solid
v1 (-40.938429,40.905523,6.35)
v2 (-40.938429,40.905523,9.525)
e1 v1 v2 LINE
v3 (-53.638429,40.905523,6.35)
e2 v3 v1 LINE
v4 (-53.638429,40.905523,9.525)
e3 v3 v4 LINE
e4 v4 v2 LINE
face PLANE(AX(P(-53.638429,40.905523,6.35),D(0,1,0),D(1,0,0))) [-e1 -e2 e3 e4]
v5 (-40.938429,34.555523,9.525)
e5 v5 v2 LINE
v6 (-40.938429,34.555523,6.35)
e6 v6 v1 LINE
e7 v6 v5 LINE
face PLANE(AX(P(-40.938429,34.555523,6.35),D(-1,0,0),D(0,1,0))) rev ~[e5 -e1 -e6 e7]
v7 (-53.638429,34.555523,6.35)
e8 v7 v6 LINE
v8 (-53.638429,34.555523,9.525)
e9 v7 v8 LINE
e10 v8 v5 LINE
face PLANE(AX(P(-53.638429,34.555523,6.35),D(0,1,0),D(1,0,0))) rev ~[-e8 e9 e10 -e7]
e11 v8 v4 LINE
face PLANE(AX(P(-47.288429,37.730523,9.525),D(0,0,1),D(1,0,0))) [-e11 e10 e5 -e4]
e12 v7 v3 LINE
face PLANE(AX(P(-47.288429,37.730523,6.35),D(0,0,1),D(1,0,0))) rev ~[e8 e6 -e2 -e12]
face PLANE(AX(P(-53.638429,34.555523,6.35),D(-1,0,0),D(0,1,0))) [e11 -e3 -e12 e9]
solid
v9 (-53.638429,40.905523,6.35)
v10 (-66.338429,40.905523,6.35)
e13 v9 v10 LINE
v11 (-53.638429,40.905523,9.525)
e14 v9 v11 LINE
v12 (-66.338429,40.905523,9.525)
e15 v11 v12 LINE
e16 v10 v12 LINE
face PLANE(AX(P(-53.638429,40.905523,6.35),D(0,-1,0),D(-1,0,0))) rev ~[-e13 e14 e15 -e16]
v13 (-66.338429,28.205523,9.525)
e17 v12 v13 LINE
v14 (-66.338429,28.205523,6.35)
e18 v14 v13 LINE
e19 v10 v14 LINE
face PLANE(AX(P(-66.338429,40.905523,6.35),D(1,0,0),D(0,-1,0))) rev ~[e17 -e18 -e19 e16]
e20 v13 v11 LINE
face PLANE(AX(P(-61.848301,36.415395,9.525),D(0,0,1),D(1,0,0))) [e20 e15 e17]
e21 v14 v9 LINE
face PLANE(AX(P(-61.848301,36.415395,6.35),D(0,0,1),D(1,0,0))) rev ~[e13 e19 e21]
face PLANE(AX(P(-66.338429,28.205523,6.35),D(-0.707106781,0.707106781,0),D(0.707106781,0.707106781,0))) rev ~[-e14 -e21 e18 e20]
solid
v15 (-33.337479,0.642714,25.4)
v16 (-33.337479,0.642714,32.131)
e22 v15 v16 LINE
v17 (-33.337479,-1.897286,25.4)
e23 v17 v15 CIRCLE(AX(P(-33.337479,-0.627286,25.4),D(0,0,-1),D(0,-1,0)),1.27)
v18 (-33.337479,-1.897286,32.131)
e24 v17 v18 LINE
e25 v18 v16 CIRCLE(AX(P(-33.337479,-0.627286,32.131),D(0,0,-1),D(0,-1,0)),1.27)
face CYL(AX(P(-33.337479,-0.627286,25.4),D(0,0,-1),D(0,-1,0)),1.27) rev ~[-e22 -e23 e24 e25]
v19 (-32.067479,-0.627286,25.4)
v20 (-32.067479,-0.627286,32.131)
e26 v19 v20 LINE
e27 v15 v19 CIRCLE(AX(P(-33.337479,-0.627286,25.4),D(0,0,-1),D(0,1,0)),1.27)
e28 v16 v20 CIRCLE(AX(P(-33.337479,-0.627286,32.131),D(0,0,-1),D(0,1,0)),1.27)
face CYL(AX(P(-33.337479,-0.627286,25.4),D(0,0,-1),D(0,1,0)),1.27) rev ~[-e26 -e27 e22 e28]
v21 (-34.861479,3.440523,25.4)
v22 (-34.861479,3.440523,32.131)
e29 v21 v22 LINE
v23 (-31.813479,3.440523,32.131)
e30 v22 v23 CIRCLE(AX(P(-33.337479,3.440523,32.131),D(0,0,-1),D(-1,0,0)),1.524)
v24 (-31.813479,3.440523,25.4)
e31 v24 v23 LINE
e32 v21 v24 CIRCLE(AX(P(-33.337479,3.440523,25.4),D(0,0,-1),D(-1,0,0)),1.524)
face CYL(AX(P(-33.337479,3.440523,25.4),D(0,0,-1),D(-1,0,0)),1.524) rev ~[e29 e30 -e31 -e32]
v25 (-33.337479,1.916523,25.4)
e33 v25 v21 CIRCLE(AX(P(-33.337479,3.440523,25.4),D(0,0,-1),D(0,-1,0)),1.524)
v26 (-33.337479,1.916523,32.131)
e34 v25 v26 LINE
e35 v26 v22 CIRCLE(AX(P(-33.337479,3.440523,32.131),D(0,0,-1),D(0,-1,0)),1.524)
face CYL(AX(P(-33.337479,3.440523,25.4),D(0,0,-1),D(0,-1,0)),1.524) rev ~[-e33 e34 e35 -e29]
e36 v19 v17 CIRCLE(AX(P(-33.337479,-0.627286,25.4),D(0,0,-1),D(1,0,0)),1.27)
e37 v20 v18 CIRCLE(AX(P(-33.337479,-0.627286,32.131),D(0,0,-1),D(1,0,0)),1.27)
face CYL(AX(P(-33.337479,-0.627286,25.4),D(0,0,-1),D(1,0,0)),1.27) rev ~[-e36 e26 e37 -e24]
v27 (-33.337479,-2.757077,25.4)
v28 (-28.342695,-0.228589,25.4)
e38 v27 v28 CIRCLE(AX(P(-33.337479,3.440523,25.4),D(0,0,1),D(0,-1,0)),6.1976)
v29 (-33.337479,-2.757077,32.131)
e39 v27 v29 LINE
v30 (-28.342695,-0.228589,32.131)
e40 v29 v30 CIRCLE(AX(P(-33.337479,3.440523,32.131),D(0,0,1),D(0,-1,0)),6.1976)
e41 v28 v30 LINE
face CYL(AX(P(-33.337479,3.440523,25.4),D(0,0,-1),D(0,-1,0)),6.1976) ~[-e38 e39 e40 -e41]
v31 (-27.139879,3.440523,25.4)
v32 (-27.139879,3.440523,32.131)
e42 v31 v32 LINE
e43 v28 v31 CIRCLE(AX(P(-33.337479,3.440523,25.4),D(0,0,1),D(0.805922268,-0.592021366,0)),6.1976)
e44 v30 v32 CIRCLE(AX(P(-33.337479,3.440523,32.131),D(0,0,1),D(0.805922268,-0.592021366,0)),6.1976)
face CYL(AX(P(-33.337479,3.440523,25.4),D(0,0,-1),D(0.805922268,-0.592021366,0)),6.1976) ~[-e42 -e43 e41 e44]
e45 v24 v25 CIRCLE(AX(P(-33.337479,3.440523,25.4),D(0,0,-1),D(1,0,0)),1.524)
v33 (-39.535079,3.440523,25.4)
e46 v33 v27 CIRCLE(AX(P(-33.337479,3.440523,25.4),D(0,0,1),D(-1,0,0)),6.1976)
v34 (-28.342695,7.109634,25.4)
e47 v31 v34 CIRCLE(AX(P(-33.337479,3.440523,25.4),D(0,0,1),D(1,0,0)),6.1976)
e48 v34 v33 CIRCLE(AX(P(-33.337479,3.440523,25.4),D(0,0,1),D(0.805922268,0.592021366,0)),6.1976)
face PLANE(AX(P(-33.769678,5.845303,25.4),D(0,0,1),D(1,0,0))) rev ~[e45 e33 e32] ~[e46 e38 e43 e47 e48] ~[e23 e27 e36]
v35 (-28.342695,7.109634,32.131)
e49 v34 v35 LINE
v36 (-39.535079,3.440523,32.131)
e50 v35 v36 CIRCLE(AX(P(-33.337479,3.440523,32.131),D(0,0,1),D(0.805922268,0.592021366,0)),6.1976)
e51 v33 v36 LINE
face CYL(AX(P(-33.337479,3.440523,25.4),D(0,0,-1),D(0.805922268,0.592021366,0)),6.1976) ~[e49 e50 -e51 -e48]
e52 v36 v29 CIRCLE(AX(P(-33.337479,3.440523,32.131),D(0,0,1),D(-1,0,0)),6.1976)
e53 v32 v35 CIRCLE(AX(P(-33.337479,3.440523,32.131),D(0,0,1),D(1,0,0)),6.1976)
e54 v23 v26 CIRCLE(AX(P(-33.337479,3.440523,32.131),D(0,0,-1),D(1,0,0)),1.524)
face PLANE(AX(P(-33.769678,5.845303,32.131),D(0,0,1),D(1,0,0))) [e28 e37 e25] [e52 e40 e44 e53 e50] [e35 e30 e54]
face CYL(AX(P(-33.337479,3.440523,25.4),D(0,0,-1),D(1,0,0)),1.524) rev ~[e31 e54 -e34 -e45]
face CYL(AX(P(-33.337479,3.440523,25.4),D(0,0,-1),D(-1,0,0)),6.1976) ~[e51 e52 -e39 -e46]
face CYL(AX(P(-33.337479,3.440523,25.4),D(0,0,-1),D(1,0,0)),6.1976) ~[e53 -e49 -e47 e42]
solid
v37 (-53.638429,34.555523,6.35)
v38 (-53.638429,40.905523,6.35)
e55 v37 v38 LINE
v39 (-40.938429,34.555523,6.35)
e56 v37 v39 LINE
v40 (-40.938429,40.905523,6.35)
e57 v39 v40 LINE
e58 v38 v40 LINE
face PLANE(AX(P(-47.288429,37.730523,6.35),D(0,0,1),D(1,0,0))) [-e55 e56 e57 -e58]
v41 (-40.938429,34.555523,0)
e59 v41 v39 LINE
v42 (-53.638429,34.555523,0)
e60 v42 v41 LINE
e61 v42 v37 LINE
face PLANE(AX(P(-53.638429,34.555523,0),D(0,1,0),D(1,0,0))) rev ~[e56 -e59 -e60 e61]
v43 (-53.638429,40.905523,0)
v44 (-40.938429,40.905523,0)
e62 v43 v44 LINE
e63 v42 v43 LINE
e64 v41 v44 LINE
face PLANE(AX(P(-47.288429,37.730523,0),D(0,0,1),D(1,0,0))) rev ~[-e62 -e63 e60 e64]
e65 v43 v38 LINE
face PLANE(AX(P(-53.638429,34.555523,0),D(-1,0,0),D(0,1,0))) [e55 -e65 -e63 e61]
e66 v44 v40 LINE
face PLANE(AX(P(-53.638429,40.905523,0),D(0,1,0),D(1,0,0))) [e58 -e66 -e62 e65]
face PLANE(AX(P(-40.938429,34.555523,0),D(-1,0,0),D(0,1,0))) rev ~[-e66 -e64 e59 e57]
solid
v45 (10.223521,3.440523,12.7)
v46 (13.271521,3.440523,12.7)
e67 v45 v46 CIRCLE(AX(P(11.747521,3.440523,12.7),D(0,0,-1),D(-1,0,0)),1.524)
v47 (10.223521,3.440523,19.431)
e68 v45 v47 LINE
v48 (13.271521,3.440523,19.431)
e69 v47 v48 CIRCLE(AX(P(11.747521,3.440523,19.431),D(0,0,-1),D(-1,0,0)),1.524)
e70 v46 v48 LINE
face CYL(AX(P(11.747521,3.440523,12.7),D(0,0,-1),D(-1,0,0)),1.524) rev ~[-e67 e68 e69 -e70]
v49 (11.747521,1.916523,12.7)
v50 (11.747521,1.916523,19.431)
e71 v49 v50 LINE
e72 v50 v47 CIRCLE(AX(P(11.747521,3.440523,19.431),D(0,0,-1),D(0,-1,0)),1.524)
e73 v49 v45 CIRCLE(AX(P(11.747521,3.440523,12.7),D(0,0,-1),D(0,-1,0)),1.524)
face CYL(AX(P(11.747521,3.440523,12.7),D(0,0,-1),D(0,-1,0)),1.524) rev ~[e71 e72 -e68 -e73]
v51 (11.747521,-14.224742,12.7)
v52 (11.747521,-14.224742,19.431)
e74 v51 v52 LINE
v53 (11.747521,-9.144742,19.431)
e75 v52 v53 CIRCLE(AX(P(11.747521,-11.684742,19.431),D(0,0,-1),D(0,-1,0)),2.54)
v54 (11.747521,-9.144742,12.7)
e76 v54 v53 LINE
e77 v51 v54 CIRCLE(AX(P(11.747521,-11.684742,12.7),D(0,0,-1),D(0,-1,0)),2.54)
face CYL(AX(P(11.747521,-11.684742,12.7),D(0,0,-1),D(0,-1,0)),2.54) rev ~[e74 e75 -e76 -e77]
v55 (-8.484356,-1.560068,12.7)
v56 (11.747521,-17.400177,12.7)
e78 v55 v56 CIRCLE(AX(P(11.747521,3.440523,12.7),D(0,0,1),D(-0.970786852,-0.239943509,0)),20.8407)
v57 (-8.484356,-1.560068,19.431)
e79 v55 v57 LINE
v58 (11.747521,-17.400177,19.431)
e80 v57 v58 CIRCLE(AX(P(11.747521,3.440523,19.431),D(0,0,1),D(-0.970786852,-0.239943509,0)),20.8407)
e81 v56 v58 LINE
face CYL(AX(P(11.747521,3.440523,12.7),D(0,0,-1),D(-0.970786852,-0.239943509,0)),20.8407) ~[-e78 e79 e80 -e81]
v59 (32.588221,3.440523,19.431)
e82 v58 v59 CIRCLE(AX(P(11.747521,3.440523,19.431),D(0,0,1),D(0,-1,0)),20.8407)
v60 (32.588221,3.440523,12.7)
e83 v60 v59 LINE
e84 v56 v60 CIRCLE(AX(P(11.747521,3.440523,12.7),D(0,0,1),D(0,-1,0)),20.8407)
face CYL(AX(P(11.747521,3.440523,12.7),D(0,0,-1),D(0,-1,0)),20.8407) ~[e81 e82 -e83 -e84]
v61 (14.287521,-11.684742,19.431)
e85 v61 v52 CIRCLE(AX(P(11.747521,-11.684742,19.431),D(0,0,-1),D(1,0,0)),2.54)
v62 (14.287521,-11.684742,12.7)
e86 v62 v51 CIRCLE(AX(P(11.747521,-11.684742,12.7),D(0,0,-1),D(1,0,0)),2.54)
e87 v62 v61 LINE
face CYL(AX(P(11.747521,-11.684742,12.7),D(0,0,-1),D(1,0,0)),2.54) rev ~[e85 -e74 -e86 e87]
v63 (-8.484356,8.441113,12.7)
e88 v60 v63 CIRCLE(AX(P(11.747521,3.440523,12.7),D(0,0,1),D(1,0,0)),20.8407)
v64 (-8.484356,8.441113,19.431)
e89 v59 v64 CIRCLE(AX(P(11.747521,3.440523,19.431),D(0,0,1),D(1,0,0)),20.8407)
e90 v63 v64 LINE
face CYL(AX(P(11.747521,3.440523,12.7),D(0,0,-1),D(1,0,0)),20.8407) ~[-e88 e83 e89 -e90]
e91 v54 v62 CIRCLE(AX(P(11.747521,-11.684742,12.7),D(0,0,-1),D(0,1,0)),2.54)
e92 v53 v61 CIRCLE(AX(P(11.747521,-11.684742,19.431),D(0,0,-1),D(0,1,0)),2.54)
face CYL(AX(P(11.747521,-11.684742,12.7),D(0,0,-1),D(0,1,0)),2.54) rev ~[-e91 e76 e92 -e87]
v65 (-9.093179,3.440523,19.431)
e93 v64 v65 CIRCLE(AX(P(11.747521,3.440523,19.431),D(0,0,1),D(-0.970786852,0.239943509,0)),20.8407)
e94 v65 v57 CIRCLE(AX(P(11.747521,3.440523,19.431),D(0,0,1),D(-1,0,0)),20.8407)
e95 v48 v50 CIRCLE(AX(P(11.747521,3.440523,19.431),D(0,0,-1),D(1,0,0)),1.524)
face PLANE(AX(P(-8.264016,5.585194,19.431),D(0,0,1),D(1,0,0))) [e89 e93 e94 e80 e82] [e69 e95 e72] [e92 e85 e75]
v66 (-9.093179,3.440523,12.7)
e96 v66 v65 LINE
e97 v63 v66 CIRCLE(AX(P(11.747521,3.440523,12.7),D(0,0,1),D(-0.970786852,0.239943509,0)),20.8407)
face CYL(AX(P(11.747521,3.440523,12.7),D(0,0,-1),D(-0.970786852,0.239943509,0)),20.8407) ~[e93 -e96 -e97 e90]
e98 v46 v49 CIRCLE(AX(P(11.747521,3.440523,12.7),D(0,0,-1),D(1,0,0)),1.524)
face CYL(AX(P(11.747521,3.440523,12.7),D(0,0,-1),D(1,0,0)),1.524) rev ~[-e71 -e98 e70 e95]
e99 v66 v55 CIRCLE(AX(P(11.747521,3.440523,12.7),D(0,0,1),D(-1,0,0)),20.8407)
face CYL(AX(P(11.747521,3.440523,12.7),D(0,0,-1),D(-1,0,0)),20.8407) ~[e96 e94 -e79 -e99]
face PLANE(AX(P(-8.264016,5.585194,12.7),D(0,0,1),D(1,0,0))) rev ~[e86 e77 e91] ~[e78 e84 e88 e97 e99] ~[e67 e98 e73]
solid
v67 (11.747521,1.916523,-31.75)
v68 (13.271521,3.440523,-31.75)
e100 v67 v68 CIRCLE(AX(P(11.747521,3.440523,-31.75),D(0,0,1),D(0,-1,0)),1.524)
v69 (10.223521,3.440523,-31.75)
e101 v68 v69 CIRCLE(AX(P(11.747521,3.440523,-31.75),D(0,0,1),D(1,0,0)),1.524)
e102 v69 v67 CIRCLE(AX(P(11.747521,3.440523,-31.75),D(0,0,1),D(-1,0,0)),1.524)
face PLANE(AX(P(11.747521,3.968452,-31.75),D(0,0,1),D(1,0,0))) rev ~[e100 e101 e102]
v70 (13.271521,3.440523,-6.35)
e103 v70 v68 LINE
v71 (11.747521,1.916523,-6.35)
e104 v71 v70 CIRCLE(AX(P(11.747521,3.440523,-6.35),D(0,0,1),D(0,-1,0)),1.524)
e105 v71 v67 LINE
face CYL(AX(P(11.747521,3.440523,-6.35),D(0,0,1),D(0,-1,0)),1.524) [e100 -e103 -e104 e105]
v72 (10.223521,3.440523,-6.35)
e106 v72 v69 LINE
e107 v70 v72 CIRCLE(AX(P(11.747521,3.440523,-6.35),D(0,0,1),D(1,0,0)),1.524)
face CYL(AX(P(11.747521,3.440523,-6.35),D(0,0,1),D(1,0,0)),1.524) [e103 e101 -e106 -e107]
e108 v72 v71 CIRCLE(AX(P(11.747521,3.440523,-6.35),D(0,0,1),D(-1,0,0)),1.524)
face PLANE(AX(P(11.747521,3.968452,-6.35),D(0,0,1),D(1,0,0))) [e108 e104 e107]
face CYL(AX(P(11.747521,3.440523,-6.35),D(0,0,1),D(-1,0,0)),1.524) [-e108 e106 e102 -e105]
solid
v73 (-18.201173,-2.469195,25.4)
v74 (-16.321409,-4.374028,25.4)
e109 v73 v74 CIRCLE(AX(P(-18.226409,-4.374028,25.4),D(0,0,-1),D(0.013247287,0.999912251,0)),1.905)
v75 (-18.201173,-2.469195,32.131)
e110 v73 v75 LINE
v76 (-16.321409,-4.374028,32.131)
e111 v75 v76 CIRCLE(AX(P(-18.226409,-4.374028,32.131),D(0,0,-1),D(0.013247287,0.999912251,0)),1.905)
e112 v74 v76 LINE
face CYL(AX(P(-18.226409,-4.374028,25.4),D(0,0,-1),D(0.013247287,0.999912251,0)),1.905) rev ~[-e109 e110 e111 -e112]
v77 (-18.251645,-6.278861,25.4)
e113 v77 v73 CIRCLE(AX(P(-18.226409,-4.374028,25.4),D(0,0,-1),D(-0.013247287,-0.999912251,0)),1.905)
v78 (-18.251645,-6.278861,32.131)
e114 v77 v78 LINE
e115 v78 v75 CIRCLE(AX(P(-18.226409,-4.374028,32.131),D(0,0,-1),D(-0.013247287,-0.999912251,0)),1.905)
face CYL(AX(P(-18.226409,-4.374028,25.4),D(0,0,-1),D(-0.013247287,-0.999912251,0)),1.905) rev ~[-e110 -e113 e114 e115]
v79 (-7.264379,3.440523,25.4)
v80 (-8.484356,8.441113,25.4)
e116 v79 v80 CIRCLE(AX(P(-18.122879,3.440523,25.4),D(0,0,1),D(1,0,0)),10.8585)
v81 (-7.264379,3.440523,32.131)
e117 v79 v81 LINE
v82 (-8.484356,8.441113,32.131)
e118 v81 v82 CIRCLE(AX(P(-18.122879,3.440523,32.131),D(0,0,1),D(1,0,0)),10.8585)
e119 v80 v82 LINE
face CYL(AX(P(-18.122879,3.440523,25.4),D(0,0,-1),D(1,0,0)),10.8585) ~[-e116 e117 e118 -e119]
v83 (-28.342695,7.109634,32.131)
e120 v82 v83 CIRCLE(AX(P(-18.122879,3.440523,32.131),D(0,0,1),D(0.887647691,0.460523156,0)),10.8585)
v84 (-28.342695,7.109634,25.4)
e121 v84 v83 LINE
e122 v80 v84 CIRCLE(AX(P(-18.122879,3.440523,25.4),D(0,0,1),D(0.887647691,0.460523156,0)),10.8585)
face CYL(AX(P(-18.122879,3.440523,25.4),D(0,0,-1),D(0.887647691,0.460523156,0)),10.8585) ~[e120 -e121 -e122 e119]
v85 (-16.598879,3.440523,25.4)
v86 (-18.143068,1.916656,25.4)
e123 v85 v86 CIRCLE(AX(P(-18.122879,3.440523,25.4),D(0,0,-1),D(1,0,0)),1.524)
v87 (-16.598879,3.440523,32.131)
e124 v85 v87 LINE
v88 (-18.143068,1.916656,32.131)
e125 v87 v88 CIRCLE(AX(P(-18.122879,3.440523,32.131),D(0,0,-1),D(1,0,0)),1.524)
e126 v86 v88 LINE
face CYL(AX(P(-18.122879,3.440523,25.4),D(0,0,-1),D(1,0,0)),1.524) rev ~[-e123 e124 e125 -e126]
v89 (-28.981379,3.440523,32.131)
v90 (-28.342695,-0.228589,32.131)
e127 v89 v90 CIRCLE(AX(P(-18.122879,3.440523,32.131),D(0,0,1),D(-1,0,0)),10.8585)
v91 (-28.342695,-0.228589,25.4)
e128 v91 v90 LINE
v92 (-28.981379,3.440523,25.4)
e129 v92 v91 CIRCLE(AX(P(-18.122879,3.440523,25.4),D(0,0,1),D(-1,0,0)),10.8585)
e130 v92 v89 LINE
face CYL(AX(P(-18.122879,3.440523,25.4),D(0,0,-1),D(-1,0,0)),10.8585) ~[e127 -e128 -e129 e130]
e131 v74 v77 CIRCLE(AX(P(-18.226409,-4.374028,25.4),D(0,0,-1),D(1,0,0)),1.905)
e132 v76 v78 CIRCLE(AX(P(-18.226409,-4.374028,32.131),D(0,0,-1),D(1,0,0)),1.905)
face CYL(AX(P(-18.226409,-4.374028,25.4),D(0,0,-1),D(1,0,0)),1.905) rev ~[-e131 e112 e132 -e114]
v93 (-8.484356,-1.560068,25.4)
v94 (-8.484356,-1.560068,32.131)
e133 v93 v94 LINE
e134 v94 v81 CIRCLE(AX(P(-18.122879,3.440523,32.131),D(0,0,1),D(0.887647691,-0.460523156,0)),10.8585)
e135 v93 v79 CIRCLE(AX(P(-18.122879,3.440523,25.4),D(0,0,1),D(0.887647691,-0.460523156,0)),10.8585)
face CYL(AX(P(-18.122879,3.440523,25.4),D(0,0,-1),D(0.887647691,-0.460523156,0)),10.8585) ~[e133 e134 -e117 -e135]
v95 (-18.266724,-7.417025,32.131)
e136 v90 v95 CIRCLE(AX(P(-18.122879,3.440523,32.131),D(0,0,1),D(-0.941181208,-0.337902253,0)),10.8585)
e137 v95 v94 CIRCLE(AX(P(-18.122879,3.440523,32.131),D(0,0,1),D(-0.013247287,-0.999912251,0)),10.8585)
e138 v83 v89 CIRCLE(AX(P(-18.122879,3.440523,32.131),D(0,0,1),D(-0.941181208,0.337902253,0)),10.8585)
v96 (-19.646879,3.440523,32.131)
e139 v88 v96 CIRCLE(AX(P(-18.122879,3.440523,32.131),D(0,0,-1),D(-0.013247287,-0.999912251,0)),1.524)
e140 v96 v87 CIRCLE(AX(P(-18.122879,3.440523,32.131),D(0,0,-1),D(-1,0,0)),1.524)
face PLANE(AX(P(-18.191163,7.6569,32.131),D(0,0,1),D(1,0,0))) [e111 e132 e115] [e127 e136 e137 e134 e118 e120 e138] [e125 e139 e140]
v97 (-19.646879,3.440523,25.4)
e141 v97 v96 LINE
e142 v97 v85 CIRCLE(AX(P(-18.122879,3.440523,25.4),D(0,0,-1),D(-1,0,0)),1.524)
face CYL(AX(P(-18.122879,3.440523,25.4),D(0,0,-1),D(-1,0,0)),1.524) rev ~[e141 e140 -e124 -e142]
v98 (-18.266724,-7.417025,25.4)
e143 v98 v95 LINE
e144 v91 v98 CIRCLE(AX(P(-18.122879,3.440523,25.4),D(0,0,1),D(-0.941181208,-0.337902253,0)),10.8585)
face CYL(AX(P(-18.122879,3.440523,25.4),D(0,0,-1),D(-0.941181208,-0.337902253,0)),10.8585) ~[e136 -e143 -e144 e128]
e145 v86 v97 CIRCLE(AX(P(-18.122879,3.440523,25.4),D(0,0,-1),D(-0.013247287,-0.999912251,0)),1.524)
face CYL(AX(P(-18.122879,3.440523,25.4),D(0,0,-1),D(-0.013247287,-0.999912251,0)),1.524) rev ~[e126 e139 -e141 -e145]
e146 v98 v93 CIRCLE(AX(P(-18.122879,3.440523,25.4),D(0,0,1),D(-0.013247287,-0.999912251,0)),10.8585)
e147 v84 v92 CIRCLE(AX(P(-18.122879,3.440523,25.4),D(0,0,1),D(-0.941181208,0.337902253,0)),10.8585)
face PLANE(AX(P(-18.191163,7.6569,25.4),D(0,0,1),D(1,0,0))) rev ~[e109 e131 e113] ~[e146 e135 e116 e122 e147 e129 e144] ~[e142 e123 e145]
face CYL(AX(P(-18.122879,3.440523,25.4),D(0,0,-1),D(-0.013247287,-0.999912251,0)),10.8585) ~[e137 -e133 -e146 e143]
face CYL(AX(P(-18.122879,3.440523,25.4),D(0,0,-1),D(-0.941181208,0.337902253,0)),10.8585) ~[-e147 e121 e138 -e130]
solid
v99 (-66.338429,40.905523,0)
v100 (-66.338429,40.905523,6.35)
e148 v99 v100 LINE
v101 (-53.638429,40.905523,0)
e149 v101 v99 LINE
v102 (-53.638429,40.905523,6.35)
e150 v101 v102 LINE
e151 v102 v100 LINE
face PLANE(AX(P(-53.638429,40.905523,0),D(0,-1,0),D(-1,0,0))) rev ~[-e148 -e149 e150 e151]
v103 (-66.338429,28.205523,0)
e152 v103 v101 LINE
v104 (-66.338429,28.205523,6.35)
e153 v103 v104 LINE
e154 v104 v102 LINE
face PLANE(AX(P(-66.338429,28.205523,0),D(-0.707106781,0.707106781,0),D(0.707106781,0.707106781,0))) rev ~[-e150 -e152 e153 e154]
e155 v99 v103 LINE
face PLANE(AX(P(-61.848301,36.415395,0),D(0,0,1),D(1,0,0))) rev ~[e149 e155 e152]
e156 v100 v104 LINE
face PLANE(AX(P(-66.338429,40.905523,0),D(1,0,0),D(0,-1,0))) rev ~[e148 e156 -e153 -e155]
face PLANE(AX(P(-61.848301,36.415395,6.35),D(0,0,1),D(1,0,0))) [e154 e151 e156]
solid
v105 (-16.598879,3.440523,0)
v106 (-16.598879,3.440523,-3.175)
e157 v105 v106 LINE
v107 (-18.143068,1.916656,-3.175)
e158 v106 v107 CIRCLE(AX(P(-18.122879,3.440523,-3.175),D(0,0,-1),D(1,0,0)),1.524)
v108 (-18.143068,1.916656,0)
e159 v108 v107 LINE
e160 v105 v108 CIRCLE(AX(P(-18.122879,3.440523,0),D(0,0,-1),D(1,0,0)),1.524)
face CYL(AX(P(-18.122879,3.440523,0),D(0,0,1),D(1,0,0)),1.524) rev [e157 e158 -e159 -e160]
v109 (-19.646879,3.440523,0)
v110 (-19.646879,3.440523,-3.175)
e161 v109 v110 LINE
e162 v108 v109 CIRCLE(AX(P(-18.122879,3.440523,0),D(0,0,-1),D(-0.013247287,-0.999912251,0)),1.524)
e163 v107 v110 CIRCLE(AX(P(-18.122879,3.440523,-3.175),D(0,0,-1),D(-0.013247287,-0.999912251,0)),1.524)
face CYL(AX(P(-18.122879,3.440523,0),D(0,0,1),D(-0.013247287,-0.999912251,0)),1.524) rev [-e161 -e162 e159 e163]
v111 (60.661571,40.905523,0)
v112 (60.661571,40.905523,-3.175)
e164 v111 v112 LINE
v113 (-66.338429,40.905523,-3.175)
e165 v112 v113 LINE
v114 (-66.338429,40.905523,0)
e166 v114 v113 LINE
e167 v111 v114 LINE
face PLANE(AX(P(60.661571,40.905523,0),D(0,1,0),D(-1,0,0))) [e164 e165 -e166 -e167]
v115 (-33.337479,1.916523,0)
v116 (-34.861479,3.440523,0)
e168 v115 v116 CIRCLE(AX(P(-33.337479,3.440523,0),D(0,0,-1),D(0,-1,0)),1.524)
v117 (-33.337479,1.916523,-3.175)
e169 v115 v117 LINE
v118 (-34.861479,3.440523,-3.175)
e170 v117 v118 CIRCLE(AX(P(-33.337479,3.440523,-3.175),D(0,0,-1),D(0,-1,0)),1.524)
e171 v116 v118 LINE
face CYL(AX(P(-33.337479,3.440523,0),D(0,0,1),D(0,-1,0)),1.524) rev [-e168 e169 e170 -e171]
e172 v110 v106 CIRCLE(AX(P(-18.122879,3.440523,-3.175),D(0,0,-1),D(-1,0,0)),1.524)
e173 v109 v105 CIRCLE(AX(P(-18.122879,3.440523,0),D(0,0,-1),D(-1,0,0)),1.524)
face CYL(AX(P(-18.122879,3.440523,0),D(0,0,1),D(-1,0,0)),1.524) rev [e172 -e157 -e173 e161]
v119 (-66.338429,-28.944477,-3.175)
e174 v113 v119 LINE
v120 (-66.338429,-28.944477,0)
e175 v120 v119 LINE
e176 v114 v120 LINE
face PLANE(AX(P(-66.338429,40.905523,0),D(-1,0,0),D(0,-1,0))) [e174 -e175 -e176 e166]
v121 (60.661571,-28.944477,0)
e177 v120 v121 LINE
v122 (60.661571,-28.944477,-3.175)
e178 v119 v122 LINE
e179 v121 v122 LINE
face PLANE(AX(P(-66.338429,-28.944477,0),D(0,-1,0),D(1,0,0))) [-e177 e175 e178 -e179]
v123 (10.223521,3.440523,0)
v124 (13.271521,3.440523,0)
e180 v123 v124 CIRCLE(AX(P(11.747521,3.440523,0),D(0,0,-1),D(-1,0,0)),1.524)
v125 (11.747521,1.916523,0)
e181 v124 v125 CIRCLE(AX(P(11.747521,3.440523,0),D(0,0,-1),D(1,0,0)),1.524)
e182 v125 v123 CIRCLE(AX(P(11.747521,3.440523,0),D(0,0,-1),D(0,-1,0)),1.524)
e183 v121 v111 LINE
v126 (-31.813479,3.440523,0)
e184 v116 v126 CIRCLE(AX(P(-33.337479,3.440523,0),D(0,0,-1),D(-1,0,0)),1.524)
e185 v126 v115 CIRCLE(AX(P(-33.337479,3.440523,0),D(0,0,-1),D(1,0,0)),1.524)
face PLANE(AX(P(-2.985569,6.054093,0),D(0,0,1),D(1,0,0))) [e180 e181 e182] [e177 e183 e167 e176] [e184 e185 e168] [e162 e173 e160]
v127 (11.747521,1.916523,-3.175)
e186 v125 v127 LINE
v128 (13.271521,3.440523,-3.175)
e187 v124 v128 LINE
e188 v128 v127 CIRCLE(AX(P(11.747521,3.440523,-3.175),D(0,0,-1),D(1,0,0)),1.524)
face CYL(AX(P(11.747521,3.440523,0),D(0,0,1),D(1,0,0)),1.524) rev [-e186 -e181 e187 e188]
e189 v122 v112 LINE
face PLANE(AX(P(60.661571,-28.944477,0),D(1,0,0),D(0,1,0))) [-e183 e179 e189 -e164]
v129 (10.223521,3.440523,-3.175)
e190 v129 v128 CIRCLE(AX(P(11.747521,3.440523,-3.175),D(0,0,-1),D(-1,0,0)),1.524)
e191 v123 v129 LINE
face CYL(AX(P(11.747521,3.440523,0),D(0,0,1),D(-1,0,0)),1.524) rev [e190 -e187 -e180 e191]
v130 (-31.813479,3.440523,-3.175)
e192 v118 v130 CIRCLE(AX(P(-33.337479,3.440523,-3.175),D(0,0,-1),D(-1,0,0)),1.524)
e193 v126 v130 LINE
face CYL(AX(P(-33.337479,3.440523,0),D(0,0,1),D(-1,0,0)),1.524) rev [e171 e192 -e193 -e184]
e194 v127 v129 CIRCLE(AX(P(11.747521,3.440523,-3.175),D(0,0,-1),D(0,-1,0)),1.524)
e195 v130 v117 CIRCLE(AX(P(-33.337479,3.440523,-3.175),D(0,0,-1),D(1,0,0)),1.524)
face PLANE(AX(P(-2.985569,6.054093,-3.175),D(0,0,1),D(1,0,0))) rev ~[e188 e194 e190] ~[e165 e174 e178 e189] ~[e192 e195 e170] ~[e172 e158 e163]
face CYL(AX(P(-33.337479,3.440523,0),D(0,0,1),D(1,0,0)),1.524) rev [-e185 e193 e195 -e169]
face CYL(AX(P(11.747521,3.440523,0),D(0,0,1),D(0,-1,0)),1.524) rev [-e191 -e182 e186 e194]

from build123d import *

# Parameters (mm, degrees)
F0_W     = 12.7
F0_H     = 6.35
F1_DEPTH = 3.175
F2_START = 25.4
F2_DEPTH = 6.731
F3_START = 25.4
F3_DEPTH = 6.731
F4_START = 12.7
F4_DEPTH = 6.731
F5_START = -6.35
F5_DEPTH = 25.4
F6_DEPTH = 6.35
F7_DEPTH = 3.175
F8_DEPTH = 6.35
F9_DEPTH = 3.175


# Not quite as in the source:
# - a feature names something its author has since deleted; it is built from what else it names


with BuildPart() as f1:
    # F0 (on Top) → F1 (new body)
    with BuildSketch(Plane.XY):
        Polygon((-53.6384286517, 34.5555226523), (-53.6384286517, 40.9055226523), (-66.3384286517, 28.2055226523), (-66.3384286517, -28.9444773477), (60.6615713483, -28.9444773477), (60.6615713483, 40.9055226523), (-40.9384286517, 40.9055226523), (-40.9384286517, 34.5555226523), align=None)
        with BuildLine():
            ThreePointArc((-33.3374786517, -2.7570773477), (-37.7198436388, -0.9418423348), (-39.5350786517, 3.4405226523))
            ThreePointArc((-39.5350786517, 3.4405226523), (-35.2680968666, 9.3297466308), (-28.3426948036, 7.1096342711))
            ThreePointArc((-28.3426948036, 7.1096342711), (-18.8492977605, 14.2746971722), (-8.4843562027, 8.4411133425))
            ThreePointArc((-8.4843562027, 8.4411133425), (14.2662795753, 24.1284571428), (32.5882213483, 3.4405226523))
            ThreePointArc((32.5882213483, 3.4405226523), (26.484121643, -11.2960776424), (11.7475213483, -17.4001773477))
            ThreePointArc((11.7475213483, -17.4001773477), (-1.1000263962, -12.9690871372), (-8.4843562027, -1.5600680379))
            ThreePointArc((-8.4843562027, -1.5600680379), (-12.5449573003, -5.8757972031), (-18.2667243218, -7.4170245234))
            ThreePointArc((-18.2667243218, -7.4170245234), (-24.4292066664, -5.3990050059), (-28.3426948036, -0.2285889665))
            ThreePointArc((-28.3426948036, -0.2285889665), (-30.5383216722, -2.0889407904), (-33.3374786517, -2.7570773477))
        make_face(mode=Mode.SUBTRACT)
        with BuildLine():
            ThreePointArc((32.5882213483, 3.4405226523), (14.2662795753, 24.1284571428), (-8.4843562027, 8.4411133425))
            ThreePointArc((-8.4843562027, 8.4411133425), (-7.5737811011, 6.0141510479), (-7.2643786517, 3.4405226523))
            Line((-7.2643786517, 3.4405226523), (-3.4734286517, 3.4405226523))
            Line((-3.4734286517, 3.4405226523), (10.2235213483, 3.4405226523))
            ThreePointArc((10.2235213483, 3.4405226523), (11.7475213483, 4.9645226523), (13.2715213483, 3.4405226523))
            Line((13.2715213483, 3.4405226523), (32.5882213483, 3.4405226523))
        make_face()
        with BuildLine():
            ThreePointArc((11.7475213483, -17.4001773477), (26.484121643, -11.2960776424), (32.5882213483, 3.4405226523))
            Line((32.5882213483, 3.4405226523), (13.2715213483, 3.4405226523))
            ThreePointArc((13.2715213483, 3.4405226523), (12.8251520828, 2.3628919178), (11.7475213483, 1.9165226523))
            Line((11.7475213483, 1.9165226523), (11.7475213483, -9.1447418249))
            ThreePointArc((11.7475213483, -9.1447418249), (13.5435725725, -9.8886906007), (14.2875213483, -11.6847418249))
            ThreePointArc((14.2875213483, -11.6847418249), (13.5435725725, -13.4807930491), (11.7475213483, -14.2247418249))
            Line((11.7475213483, -14.2247418249), (11.7475213483, -17.4001773477))
        make_face()
        with BuildLine():
            Line((-3.4734286517, 3.4405226523), (-7.2643786517, 3.4405226523))
            ThreePointArc((-7.2643786517, 3.4405226523), (-7.5737811011, 0.8668942566), (-8.4843562027, -1.5600680379))
            ThreePointArc((-8.4843562027, -1.5600680379), (-1.1000263962, -12.9690871372), (11.7475213483, -17.4001773477))
            Line((11.7475213483, -17.4001773477), (11.7475213483, -14.2247418249))
            ThreePointArc((11.7475213483, -14.2247418249), (9.2075213483, -11.6847418249), (11.7475213483, -9.1447418249))
            Line((11.7475213483, -9.1447418249), (11.7475213483, 1.9165226523))
            ThreePointArc((11.7475213483, 1.9165226523), (10.6698906138, 2.3628919178), (10.2235213483, 3.4405226523))
            Line((10.2235213483, 3.4405226523), (-3.4734286517, 3.4405226523))
        make_face()
        with BuildLine():
            ThreePointArc((-28.3426948036, 7.1096342711), (-27.4482546732, 5.3711408672), (-27.1398786517, 3.4405226523))
            Line((-27.1398786517, 3.4405226523), (-19.6468786517, 3.4405226523))
            ThreePointArc((-19.6468786517, 3.4405226523), (-18.1228786517, 4.9645226523), (-16.5988786517, 3.4405226523))
            Line((-16.5988786517, 3.4405226523), (-9.0931786517, 3.4405226523))
            ThreePointArc((-9.0931786517, 3.4405226523), (-8.9404131422, 5.9592808793), (-8.4843562027, 8.4411133425))
            ThreePointArc((-8.4843562027, 8.4411133425), (-18.8492977605, 14.2746971722), (-28.3426948036, 7.1096342711))
        make_face()
        Polygon((-53.6384286517, 40.9055226523), (-66.3384286517, 40.9055226523), (-66.3384286517, 28.2055226523), align=None)
        with Locations((-47.2884286517, 37.7305226523)):
            Rectangle(F0_W, F0_H)
        with BuildLine():
            Line((-19.6468786517, 3.4405226523), (-27.1398786517, 3.4405226523))
            ThreePointArc((-27.1398786517, 3.4405226523), (-27.4482546732, 1.5099044374), (-28.3426948036, -0.2285889665))
            ThreePointArc((-28.3426948036, -0.2285889665), (-24.4292066664, -5.3990050059), (-18.2667243218, -7.4170245234))
            Line((-18.2667243218, -7.4170245234), (-18.2516454134, -6.2788605557))
            ThreePointArc((-18.2516454134, -6.2788605557), (-20.1312421688, -4.3487916354), (-18.2011732485, -2.46919488))
            Line((-18.2011732485, -2.46919488), (-18.1430675177, 1.916656382))
            ThreePointArc((-18.1430675177, 1.916656382), (-19.2076237443, 2.3700535569), (-19.6468786517, 3.4405226523))
        make_face()
        with BuildLine():
            Line((-18.2516454134, -6.2788605557), (-18.2667243218, -7.4170245234))
            ThreePointArc((-18.2667243218, -7.4170245234), (-12.5449573003, -5.8757972031), (-8.4843562027, -1.5600680379))
            ThreePointArc((-8.4843562027, -1.5600680379), (-8.9404131422, 0.9217644253), (-9.0931786517, 3.4405226523))
            Line((-9.0931786517, 3.4405226523), (-16.5988786517, 3.4405226523))
            ThreePointArc((-16.5988786517, 3.4405226523), (-17.0524095563, 2.3557775597), (-18.1430675177, 1.916656382))
            Line((-18.1430675177, 1.916656382), (-18.2011732485, -2.46919488))
            ThreePointArc((-18.2011732485, -2.46919488), (-16.8704779652, -3.0359413487), (-16.321409331, -4.3740277179))
            ThreePointArc((-16.321409331, -4.3740277179), (-16.8883229618, -5.7299590836), (-18.2516454134, -6.2788605557))
        make_face()
        with BuildLine():
            ThreePointArc((-34.8614786517, 3.4405226523), (-33.3374786517, 4.9645226523), (-31.8134786517, 3.4405226523))
            Line((-31.8134786517, 3.4405226523), (-28.9813786517, 3.4405226523))
            ThreePointArc((-28.9813786517, 3.4405226523), (-28.8205161464, 5.3026650427), (-28.3426948036, 7.1096342711))
            ThreePointArc((-28.3426948036, 7.1096342711), (-35.2680968666, 9.3297466308), (-39.5350786517, 3.4405226523))
            Line((-39.5350786517, 3.4405226523), (-34.8614786517, 3.4405226523))
        make_face()
        with BuildLine():
            Line((-33.3374786517, 0.6427138499), (-33.3374786517, 1.9165226523))
            ThreePointArc((-33.3374786517, 1.9165226523), (-34.4151093862, 2.3628919178), (-34.8614786517, 3.4405226523))
            Line((-34.8614786517, 3.4405226523), (-39.5350786517, 3.4405226523))
            ThreePointArc((-39.5350786517, 3.4405226523), (-37.7198436388, -0.9418423348), (-33.3374786517, -2.7570773477))
            Line((-33.3374786517, -2.7570773477), (-33.3374786517, -1.8972861501))
            ThreePointArc((-33.3374786517, -1.8972861501), (-34.6074786517, -0.6272861501), (-33.3374786517, 0.6427138499))
        make_face()
        with BuildLine():
            Line((-28.9813786517, 3.4405226523), (-31.8134786517, 3.4405226523))
            ThreePointArc((-31.8134786517, 3.4405226523), (-32.2598479172, 2.3628919178), (-33.3374786517, 1.9165226523))
            Line((-33.3374786517, 1.9165226523), (-33.3374786517, 0.6427138499))
            ThreePointArc((-33.3374786517, 0.6427138499), (-32.4394530396, 0.270739462), (-32.0674786517, -0.6272861501))
            ThreePointArc((-32.0674786517, -0.6272861501), (-32.4394530396, -1.5253117622), (-33.3374786517, -1.8972861501))
            Line((-33.3374786517, -1.8972861501), (-33.3374786517, -2.7570773477))
            ThreePointArc((-33.3374786517, -2.7570773477), (-30.5383216722, -2.0889407904), (-28.3426948036, -0.2285889665))
            ThreePointArc((-28.3426948036, -0.2285889665), (-28.8205161464, 1.5783802619), (-28.9813786517, 3.4405226523))
        make_face()
        with BuildLine():
            Line((11.7475213483, -9.1447418249), (11.7475213483, -14.2247418249))
            ThreePointArc((11.7475213483, -14.2247418249), (13.5435725725, -13.4807930491), (14.2875213483, -11.6847418249))
            ThreePointArc((14.2875213483, -11.6847418249), (13.5435725725, -9.8886906007), (11.7475213483, -9.1447418249))
        make_face()
        with BuildLine():
            ThreePointArc((11.7475213483, -9.1447418249), (9.2075213483, -11.6847418249), (11.7475213483, -14.2247418249))
            Line((11.7475213483, -14.2247418249), (11.7475213483, -9.1447418249))
        make_face()
        with BuildLine():
            Line((-7.2643786517, 3.4405226523), (-9.0931786517, 3.4405226523))
            ThreePointArc((-9.0931786517, 3.4405226523), (-8.9404131422, 0.9217644253), (-8.4843562027, -1.5600680379))
            ThreePointArc((-8.4843562027, -1.5600680379), (-7.5737811011, 0.8668942566), (-7.2643786517, 3.4405226523))
        make_face()
        with BuildLine():
            ThreePointArc((-7.2643786517, 3.4405226523), (-7.5737811011, 6.0141510479), (-8.4843562027, 8.4411133425))
            ThreePointArc((-8.4843562027, 8.4411133425), (-8.9404131422, 5.9592808793), (-9.0931786517, 3.4405226523))
            Line((-9.0931786517, 3.4405226523), (-7.2643786517, 3.4405226523))
        make_face()
        with BuildLine():
            Line((-18.2011732485, -2.46919488), (-18.2516454134, -6.2788605557))
            ThreePointArc((-18.2516454134, -6.2788605557), (-16.8883229618, -5.7299590836), (-16.321409331, -4.3740277179))
            ThreePointArc((-16.321409331, -4.3740277179), (-16.8704779652, -3.0359413487), (-18.2011732485, -2.46919488))
        make_face()
        with BuildLine():
            ThreePointArc((-18.2011732485, -2.46919488), (-20.1312421688, -4.3487916354), (-18.2516454134, -6.2788605557))
            Line((-18.2516454134, -6.2788605557), (-18.2011732485, -2.46919488))
        make_face()
        with BuildLine():
            Line((-27.1398786517, 3.4405226523), (-28.9813786517, 3.4405226523))
            ThreePointArc((-28.9813786517, 3.4405226523), (-28.8205161464, 1.5783802619), (-28.3426948036, -0.2285889665))
            ThreePointArc((-28.3426948036, -0.2285889665), (-27.4482546732, 1.5099044374), (-27.1398786517, 3.4405226523))
        make_face()
        with BuildLine():
            ThreePointArc((-28.3426948036, 7.1096342711), (-28.8205161464, 5.3026650427), (-28.9813786517, 3.4405226523))
            Line((-28.9813786517, 3.4405226523), (-27.1398786517, 3.4405226523))
            ThreePointArc((-27.1398786517, 3.4405226523), (-27.4482546732, 5.3711408672), (-28.3426948036, 7.1096342711))
        make_face()
        with BuildLine():
            Line((-33.3374786517, -1.8972861501), (-33.3374786517, 0.6427138499))
            ThreePointArc((-33.3374786517, 0.6427138499), (-34.6074786517, -0.6272861501), (-33.3374786517, -1.8972861501))
        make_face()
        with BuildLine():
            ThreePointArc((-32.0674786517, -0.6272861501), (-32.4394530396, 0.270739462), (-33.3374786517, 0.6427138499))
            Line((-33.3374786517, 0.6427138499), (-33.3374786517, -1.8972861501))
            ThreePointArc((-33.3374786517, -1.8972861501), (-32.4394530396, -1.5253117622), (-32.0674786517, -0.6272861501))
        make_face()
    extrude(amount=-F1_DEPTH)


with BuildPart() as f2:
    # F0 (on Top) → F2 (new body)
    with BuildSketch(Plane.XY.offset(F2_START)):
        with BuildLine():
            ThreePointArc((-34.8614786517, 3.4405226523), (-33.3374786517, 4.9645226523), (-31.8134786517, 3.4405226523))
            Line((-31.8134786517, 3.4405226523), (-28.9813786517, 3.4405226523))
            ThreePointArc((-28.9813786517, 3.4405226523), (-28.8205161464, 5.3026650427), (-28.3426948036, 7.1096342711))
            ThreePointArc((-28.3426948036, 7.1096342711), (-35.2680968666, 9.3297466308), (-39.5350786517, 3.4405226523))
            Line((-39.5350786517, 3.4405226523), (-34.8614786517, 3.4405226523))
        make_face()
        with BuildLine():
            Line((-33.3374786517, 0.6427138499), (-33.3374786517, 1.9165226523))
            ThreePointArc((-33.3374786517, 1.9165226523), (-34.4151093862, 2.3628919178), (-34.8614786517, 3.4405226523))
            Line((-34.8614786517, 3.4405226523), (-39.5350786517, 3.4405226523))
            ThreePointArc((-39.5350786517, 3.4405226523), (-37.7198436388, -0.9418423348), (-33.3374786517, -2.7570773477))
            Line((-33.3374786517, -2.7570773477), (-33.3374786517, -1.8972861501))
            ThreePointArc((-33.3374786517, -1.8972861501), (-34.6074786517, -0.6272861501), (-33.3374786517, 0.6427138499))
        make_face()
        with BuildLine():
            Line((-28.9813786517, 3.4405226523), (-31.8134786517, 3.4405226523))
            ThreePointArc((-31.8134786517, 3.4405226523), (-32.2598479172, 2.3628919178), (-33.3374786517, 1.9165226523))
            Line((-33.3374786517, 1.9165226523), (-33.3374786517, 0.6427138499))
            ThreePointArc((-33.3374786517, 0.6427138499), (-32.4394530396, 0.270739462), (-32.0674786517, -0.6272861501))
            ThreePointArc((-32.0674786517, -0.6272861501), (-32.4394530396, -1.5253117622), (-33.3374786517, -1.8972861501))
            Line((-33.3374786517, -1.8972861501), (-33.3374786517, -2.7570773477))
            ThreePointArc((-33.3374786517, -2.7570773477), (-30.5383216722, -2.0889407904), (-28.3426948036, -0.2285889665))
            ThreePointArc((-28.3426948036, -0.2285889665), (-28.8205161464, 1.5783802619), (-28.9813786517, 3.4405226523))
        make_face()
        with BuildLine():
            Line((-27.1398786517, 3.4405226523), (-28.9813786517, 3.4405226523))
            ThreePointArc((-28.9813786517, 3.4405226523), (-28.8205161464, 1.5783802619), (-28.3426948036, -0.2285889665))
            ThreePointArc((-28.3426948036, -0.2285889665), (-27.4482546732, 1.5099044374), (-27.1398786517, 3.4405226523))
        make_face()
        with BuildLine():
            ThreePointArc((-28.3426948036, 7.1096342711), (-28.8205161464, 5.3026650427), (-28.9813786517, 3.4405226523))
            Line((-28.9813786517, 3.4405226523), (-27.1398786517, 3.4405226523))
            ThreePointArc((-27.1398786517, 3.4405226523), (-27.4482546732, 5.3711408672), (-28.3426948036, 7.1096342711))
        make_face()
    extrude(amount=F2_DEPTH)


with BuildPart() as f3:
    # F0 (on Top) → F3 (new body)
    with BuildSketch(Plane.XY.offset(F3_START)):
        with BuildLine():
            ThreePointArc((-28.3426948036, 7.1096342711), (-27.4482546732, 5.3711408672), (-27.1398786517, 3.4405226523))
            Line((-27.1398786517, 3.4405226523), (-19.6468786517, 3.4405226523))
            ThreePointArc((-19.6468786517, 3.4405226523), (-18.1228786517, 4.9645226523), (-16.5988786517, 3.4405226523))
            Line((-16.5988786517, 3.4405226523), (-9.0931786517, 3.4405226523))
            ThreePointArc((-9.0931786517, 3.4405226523), (-8.9404131422, 5.9592808793), (-8.4843562027, 8.4411133425))
            ThreePointArc((-8.4843562027, 8.4411133425), (-18.8492977605, 14.2746971722), (-28.3426948036, 7.1096342711))
        make_face()
        with BuildLine():
            Line((-19.6468786517, 3.4405226523), (-27.1398786517, 3.4405226523))
            ThreePointArc((-27.1398786517, 3.4405226523), (-27.4482546732, 1.5099044374), (-28.3426948036, -0.2285889665))
            ThreePointArc((-28.3426948036, -0.2285889665), (-24.4292066664, -5.3990050059), (-18.2667243218, -7.4170245234))
            Line((-18.2667243218, -7.4170245234), (-18.2516454134, -6.2788605557))
            ThreePointArc((-18.2516454134, -6.2788605557), (-20.1312421688, -4.3487916354), (-18.2011732485, -2.46919488))
            Line((-18.2011732485, -2.46919488), (-18.1430675177, 1.916656382))
            ThreePointArc((-18.1430675177, 1.916656382), (-19.2076237443, 2.3700535569), (-19.6468786517, 3.4405226523))
        make_face()
        with BuildLine():
            Line((-18.2516454134, -6.2788605557), (-18.2667243218, -7.4170245234))
            ThreePointArc((-18.2667243218, -7.4170245234), (-12.5449573003, -5.8757972031), (-8.4843562027, -1.5600680379))
            ThreePointArc((-8.4843562027, -1.5600680379), (-8.9404131422, 0.9217644253), (-9.0931786517, 3.4405226523))
            Line((-9.0931786517, 3.4405226523), (-16.5988786517, 3.4405226523))
            ThreePointArc((-16.5988786517, 3.4405226523), (-17.0524095563, 2.3557775597), (-18.1430675177, 1.916656382))
            Line((-18.1430675177, 1.916656382), (-18.2011732485, -2.46919488))
            ThreePointArc((-18.2011732485, -2.46919488), (-16.8704779652, -3.0359413487), (-16.321409331, -4.3740277179))
            ThreePointArc((-16.321409331, -4.3740277179), (-16.8883229618, -5.7299590836), (-18.2516454134, -6.2788605557))
        make_face()
        with BuildLine():
            ThreePointArc((-28.3426948036, 7.1096342711), (-28.8205161464, 5.3026650427), (-28.9813786517, 3.4405226523))
            Line((-28.9813786517, 3.4405226523), (-27.1398786517, 3.4405226523))
            ThreePointArc((-27.1398786517, 3.4405226523), (-27.4482546732, 5.3711408672), (-28.3426948036, 7.1096342711))
        make_face()
        with BuildLine():
            Line((-27.1398786517, 3.4405226523), (-28.9813786517, 3.4405226523))
            ThreePointArc((-28.9813786517, 3.4405226523), (-28.8205161464, 1.5783802619), (-28.3426948036, -0.2285889665))
            ThreePointArc((-28.3426948036, -0.2285889665), (-27.4482546732, 1.5099044374), (-27.1398786517, 3.4405226523))
        make_face()
        with BuildLine():
            ThreePointArc((-7.2643786517, 3.4405226523), (-7.5737811011, 6.0141510479), (-8.4843562027, 8.4411133425))
            ThreePointArc((-8.4843562027, 8.4411133425), (-8.9404131422, 5.9592808793), (-9.0931786517, 3.4405226523))
            Line((-9.0931786517, 3.4405226523), (-7.2643786517, 3.4405226523))
        make_face()
        with BuildLine():
            Line((-7.2643786517, 3.4405226523), (-9.0931786517, 3.4405226523))
            ThreePointArc((-9.0931786517, 3.4405226523), (-8.9404131422, 0.9217644253), (-8.4843562027, -1.5600680379))
            ThreePointArc((-8.4843562027, -1.5600680379), (-7.5737811011, 0.8668942566), (-7.2643786517, 3.4405226523))
        make_face()
    extrude(amount=F3_DEPTH)


with BuildPart() as f4:
    # F0 (on Top) → F4 (new body)
    with BuildSketch(Plane.XY.offset(F4_START)):
        with BuildLine():
            ThreePointArc((-7.2643786517, 3.4405226523), (-7.5737811011, 6.0141510479), (-8.4843562027, 8.4411133425))
            ThreePointArc((-8.4843562027, 8.4411133425), (-8.9404131422, 5.9592808793), (-9.0931786517, 3.4405226523))
            Line((-9.0931786517, 3.4405226523), (-7.2643786517, 3.4405226523))
        make_face()
        with BuildLine():
            ThreePointArc((32.5882213483, 3.4405226523), (14.2662795753, 24.1284571428), (-8.4843562027, 8.4411133425))
            ThreePointArc((-8.4843562027, 8.4411133425), (-7.5737811011, 6.0141510479), (-7.2643786517, 3.4405226523))
            Line((-7.2643786517, 3.4405226523), (-3.4734286517, 3.4405226523))
            Line((-3.4734286517, 3.4405226523), (10.2235213483, 3.4405226523))
            ThreePointArc((10.2235213483, 3.4405226523), (11.7475213483, 4.9645226523), (13.2715213483, 3.4405226523))
            Line((13.2715213483, 3.4405226523), (32.5882213483, 3.4405226523))
        make_face()
        with BuildLine():
            ThreePointArc((11.7475213483, -17.4001773477), (26.484121643, -11.2960776424), (32.5882213483, 3.4405226523))
            Line((32.5882213483, 3.4405226523), (13.2715213483, 3.4405226523))
            ThreePointArc((13.2715213483, 3.4405226523), (12.8251520828, 2.3628919178), (11.7475213483, 1.9165226523))
            Line((11.7475213483, 1.9165226523), (11.7475213483, -9.1447418249))
            ThreePointArc((11.7475213483, -9.1447418249), (13.5435725725, -9.8886906007), (14.2875213483, -11.6847418249))
            ThreePointArc((14.2875213483, -11.6847418249), (13.5435725725, -13.4807930491), (11.7475213483, -14.2247418249))
            Line((11.7475213483, -14.2247418249), (11.7475213483, -17.4001773477))
        make_face()
        with BuildLine():
            Line((-7.2643786517, 3.4405226523), (-9.0931786517, 3.4405226523))
            ThreePointArc((-9.0931786517, 3.4405226523), (-8.9404131422, 0.9217644253), (-8.4843562027, -1.5600680379))
            ThreePointArc((-8.4843562027, -1.5600680379), (-7.5737811011, 0.8668942566), (-7.2643786517, 3.4405226523))
        make_face()
        with BuildLine():
            Line((-3.4734286517, 3.4405226523), (-7.2643786517, 3.4405226523))
            ThreePointArc((-7.2643786517, 3.4405226523), (-7.5737811011, 0.8668942566), (-8.4843562027, -1.5600680379))
            ThreePointArc((-8.4843562027, -1.5600680379), (-1.1000263962, -12.9690871372), (11.7475213483, -17.4001773477))
            Line((11.7475213483, -17.4001773477), (11.7475213483, -14.2247418249))
            ThreePointArc((11.7475213483, -14.2247418249), (9.2075213483, -11.6847418249), (11.7475213483, -9.1447418249))
            Line((11.7475213483, -9.1447418249), (11.7475213483, 1.9165226523))
            ThreePointArc((11.7475213483, 1.9165226523), (10.6698906138, 2.3628919178), (10.2235213483, 3.4405226523))
            Line((10.2235213483, 3.4405226523), (-3.4734286517, 3.4405226523))
        make_face()
    extrude(amount=F4_DEPTH)


with BuildPart() as f5:
    # F0 (on Top) → F5 (new body)
    with BuildSketch(Plane.XY.offset(F5_START)):
        with BuildLine():
            Line((11.7475213483, 3.4405226523), (13.2715213483, 3.4405226523))
            ThreePointArc((13.2715213483, 3.4405226523), (11.7475213483, 4.9645226523), (10.2235213483, 3.4405226523))
            Line((10.2235213483, 3.4405226523), (11.7475213483, 3.4405226523))
        make_face()
        with BuildLine():
            Line((11.7475213483, 3.4405226523), (10.2235213483, 3.4405226523))
            ThreePointArc((10.2235213483, 3.4405226523), (10.6698906138, 2.3628919178), (11.7475213483, 1.9165226523))
            Line((11.7475213483, 1.9165226523), (11.7475213483, 3.4405226523))
        make_face()
        with BuildLine():
            ThreePointArc((11.7475213483, 1.9165226523), (12.8251520828, 2.3628919178), (13.2715213483, 3.4405226523))
            Line((13.2715213483, 3.4405226523), (11.7475213483, 3.4405226523))
            Line((11.7475213483, 3.4405226523), (11.7475213483, 1.9165226523))
        make_face()
    extrude(amount=-F5_DEPTH)


with BuildPart() as f6:
    # F0 (on Top) → F6 (new body)
    with BuildSketch(Plane.XY):
        Polygon((-53.6384286517, 40.9055226523), (-66.3384286517, 40.9055226523), (-66.3384286517, 28.2055226523), align=None)
    extrude(amount=F6_DEPTH)


with BuildPart() as f7:
    # F7 (new): a face of the model
    f7_faces = [f6.part.faces().sort_by_distance(p)[0] for p in [
        (-62.1050953184, 36.672189319, 6.35),
    ]]
    extrude(f7_faces, amount=F7_DEPTH)


with BuildPart() as f8:
    # F0 (on Top) → F8 (new body)
    with BuildSketch(Plane.XY):
        with Locations((-47.2884286517, 37.7305226523)):
            Rectangle(F0_W, F0_H)
    extrude(amount=F8_DEPTH)


with BuildPart() as f9:
    # F9 (new): a face of the model
    f9_faces = [f8.part.faces().sort_by_distance(p)[0] for p in [
        (-47.2884286517, 37.7305226523, 6.35),
    ]]
    extrude(f9_faces, amount=F9_DEPTH)


solid = Compound([f1.part, f2.part, f3.part, f4.part, f5.part, f6.part, f7.part, f8.part, f9.part])
